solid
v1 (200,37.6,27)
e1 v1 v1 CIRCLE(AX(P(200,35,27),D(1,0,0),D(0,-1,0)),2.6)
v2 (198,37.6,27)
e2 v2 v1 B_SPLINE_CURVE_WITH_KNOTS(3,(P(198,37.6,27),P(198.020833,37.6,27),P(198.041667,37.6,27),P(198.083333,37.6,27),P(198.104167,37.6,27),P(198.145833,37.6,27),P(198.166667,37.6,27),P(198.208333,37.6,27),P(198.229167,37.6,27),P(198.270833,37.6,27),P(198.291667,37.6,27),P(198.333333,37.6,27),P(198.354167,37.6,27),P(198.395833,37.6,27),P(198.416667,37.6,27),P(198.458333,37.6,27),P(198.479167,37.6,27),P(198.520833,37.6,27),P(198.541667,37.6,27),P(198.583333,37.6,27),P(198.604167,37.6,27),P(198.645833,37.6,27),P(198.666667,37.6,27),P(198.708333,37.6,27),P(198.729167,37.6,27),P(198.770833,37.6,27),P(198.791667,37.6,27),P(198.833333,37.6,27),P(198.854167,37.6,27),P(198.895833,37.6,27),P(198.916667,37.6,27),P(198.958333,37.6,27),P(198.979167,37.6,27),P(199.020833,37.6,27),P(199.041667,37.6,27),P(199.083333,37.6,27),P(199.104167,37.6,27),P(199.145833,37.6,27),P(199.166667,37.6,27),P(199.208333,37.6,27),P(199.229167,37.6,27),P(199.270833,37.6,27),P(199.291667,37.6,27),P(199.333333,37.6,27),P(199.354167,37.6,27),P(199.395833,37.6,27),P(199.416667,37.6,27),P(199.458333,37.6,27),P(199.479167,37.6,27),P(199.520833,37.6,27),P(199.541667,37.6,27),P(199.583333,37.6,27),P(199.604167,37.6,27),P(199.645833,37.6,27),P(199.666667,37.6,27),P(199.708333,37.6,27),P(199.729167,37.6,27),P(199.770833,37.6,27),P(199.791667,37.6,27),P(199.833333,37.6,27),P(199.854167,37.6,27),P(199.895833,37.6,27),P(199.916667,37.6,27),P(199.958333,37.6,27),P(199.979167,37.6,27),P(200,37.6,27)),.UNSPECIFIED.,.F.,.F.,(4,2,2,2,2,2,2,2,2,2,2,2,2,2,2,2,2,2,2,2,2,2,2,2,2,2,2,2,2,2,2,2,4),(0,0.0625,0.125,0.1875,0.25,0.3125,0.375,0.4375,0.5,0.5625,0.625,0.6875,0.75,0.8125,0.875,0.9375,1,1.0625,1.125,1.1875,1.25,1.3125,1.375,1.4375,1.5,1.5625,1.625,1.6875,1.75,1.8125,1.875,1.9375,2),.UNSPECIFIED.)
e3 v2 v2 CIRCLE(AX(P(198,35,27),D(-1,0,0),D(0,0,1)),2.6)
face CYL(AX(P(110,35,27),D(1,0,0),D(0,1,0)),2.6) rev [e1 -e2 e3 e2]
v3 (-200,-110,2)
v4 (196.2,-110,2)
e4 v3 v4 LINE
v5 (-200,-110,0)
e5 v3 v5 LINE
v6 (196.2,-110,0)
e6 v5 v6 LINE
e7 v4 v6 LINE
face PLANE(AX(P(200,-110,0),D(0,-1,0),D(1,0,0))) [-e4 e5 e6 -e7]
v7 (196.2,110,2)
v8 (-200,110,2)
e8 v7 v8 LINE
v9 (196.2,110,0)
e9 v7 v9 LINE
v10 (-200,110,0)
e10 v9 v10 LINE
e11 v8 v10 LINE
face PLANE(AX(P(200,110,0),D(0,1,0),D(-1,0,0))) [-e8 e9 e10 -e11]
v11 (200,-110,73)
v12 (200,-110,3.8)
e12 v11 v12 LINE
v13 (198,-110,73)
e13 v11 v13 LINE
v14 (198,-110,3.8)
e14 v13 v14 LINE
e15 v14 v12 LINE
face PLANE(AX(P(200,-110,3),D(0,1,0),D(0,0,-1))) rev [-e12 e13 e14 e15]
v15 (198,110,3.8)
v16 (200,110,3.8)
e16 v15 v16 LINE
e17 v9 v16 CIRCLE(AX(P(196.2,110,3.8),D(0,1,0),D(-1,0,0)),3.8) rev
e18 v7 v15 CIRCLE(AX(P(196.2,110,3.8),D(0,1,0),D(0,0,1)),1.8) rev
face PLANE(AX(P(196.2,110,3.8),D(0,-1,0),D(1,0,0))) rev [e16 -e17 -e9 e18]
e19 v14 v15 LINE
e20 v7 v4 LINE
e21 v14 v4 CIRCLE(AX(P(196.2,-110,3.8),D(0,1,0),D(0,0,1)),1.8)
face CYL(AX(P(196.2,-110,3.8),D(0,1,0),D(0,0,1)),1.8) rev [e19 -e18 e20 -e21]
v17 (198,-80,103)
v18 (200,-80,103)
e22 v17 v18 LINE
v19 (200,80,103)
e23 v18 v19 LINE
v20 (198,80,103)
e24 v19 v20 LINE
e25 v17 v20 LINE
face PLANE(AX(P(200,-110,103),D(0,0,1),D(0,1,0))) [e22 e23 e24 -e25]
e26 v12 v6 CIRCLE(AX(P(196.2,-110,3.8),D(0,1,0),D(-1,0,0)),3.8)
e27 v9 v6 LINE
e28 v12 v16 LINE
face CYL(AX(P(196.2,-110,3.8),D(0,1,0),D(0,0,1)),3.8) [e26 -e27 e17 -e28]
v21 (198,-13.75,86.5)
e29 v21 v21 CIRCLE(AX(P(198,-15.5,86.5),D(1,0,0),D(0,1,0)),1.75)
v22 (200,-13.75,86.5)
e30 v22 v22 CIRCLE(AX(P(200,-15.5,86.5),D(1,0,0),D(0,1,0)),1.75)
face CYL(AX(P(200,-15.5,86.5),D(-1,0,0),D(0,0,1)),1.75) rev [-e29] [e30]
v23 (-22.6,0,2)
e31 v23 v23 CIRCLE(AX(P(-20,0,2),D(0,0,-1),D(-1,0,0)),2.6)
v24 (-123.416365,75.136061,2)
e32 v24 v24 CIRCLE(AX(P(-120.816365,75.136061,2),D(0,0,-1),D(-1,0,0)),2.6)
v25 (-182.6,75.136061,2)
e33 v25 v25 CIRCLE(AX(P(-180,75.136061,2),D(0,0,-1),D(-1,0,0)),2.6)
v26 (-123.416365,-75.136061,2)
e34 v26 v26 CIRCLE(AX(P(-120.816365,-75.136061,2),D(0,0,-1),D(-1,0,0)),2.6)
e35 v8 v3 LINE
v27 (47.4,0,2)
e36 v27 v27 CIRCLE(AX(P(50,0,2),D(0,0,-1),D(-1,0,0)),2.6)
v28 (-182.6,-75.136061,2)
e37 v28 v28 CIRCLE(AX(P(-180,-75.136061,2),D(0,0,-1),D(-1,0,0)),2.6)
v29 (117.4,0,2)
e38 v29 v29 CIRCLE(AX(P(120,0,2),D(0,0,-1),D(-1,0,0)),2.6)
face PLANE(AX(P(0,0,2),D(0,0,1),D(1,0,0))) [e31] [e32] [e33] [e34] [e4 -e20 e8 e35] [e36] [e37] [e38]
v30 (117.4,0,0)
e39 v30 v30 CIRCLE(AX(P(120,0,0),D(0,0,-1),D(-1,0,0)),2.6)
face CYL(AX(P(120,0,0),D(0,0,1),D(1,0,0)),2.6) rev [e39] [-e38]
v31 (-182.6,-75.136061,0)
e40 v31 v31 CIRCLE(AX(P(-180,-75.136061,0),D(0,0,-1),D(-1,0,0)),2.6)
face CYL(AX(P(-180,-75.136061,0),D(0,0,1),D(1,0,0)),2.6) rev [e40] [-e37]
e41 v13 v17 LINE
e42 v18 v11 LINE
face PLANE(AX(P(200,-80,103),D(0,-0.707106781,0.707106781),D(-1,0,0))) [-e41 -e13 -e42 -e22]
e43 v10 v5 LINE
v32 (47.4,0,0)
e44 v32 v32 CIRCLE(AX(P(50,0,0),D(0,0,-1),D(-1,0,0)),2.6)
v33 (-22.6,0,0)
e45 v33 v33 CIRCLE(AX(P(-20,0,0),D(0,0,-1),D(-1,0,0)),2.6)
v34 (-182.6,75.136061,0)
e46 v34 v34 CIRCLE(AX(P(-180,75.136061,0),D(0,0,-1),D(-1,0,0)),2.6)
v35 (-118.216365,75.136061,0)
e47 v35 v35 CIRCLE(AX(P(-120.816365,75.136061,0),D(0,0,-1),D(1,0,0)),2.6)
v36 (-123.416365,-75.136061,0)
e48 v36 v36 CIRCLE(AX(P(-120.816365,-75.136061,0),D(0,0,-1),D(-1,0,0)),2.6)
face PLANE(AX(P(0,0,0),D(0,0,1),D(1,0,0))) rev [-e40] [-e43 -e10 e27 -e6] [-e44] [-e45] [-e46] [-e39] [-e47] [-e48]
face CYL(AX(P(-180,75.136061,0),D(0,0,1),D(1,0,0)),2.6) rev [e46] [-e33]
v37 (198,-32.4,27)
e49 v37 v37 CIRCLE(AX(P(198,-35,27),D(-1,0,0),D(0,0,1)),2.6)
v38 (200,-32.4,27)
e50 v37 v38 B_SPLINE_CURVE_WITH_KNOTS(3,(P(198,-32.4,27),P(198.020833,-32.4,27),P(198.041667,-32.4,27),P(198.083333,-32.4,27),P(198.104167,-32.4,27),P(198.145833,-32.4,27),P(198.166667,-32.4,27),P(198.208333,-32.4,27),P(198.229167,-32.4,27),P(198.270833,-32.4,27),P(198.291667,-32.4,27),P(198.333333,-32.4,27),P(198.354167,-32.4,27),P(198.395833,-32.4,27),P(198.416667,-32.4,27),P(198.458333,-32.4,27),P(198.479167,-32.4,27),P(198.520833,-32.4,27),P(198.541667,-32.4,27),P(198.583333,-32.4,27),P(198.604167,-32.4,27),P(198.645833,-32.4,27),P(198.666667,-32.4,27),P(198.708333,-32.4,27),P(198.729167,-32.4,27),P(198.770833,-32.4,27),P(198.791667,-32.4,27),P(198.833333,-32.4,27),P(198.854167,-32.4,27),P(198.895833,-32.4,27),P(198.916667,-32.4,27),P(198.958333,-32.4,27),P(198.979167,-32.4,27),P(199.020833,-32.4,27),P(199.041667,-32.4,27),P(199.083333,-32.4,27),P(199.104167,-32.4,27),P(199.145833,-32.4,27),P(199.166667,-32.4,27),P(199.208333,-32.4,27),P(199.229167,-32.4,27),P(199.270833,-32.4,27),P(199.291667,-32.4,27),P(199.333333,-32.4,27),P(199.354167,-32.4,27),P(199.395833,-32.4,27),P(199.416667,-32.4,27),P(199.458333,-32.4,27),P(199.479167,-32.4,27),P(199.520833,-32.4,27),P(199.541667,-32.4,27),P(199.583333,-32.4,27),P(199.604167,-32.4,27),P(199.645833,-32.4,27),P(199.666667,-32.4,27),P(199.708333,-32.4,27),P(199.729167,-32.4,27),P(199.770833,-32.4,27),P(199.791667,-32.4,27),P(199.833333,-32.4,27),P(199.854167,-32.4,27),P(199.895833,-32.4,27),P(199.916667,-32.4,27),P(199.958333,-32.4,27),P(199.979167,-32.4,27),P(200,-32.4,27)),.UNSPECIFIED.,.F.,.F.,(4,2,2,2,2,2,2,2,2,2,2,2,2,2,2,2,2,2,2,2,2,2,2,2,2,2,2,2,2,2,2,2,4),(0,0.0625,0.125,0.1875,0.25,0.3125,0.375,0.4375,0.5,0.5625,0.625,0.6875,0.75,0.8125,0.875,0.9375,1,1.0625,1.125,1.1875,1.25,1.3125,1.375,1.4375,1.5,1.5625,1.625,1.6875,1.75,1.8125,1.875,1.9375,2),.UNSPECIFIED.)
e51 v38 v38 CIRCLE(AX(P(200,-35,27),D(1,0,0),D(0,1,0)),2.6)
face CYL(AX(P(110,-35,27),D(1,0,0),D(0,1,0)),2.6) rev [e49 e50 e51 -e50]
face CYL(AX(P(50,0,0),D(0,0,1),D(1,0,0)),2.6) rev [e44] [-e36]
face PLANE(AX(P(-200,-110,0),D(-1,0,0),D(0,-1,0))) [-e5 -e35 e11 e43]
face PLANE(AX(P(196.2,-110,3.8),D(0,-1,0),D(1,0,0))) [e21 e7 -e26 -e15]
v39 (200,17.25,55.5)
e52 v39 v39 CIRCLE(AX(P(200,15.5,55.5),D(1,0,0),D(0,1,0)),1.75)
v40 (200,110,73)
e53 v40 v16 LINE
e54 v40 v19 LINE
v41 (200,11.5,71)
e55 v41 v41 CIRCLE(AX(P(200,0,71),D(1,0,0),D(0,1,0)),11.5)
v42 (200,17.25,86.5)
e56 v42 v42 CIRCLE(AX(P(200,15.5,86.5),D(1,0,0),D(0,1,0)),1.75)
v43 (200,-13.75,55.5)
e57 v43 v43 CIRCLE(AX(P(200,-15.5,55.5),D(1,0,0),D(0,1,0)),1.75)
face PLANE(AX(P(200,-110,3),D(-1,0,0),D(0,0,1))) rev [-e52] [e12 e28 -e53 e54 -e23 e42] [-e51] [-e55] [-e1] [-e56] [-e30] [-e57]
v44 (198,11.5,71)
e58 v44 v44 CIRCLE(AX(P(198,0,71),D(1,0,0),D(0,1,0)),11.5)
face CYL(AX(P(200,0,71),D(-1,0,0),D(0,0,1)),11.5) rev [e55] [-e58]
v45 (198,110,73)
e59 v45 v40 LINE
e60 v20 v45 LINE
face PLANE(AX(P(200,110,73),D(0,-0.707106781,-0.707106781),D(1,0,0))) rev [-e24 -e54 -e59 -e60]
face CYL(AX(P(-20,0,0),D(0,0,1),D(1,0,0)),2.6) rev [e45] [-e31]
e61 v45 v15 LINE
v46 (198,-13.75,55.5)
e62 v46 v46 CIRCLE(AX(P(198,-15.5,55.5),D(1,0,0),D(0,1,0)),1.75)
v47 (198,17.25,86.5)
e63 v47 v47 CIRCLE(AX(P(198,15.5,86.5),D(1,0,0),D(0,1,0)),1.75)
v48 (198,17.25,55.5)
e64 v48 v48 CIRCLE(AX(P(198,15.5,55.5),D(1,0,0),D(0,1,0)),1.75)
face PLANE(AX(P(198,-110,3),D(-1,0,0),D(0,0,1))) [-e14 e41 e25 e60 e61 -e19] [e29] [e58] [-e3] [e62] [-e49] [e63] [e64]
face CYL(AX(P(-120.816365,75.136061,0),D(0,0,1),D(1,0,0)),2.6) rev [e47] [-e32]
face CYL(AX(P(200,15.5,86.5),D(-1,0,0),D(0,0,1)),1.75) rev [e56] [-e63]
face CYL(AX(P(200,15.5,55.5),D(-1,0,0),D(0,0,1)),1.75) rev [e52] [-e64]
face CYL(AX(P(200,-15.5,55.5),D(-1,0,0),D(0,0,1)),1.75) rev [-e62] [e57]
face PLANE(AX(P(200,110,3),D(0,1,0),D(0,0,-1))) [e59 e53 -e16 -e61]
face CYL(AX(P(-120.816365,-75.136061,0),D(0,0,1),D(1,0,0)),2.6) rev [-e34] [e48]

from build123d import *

# Parameters (mm, degrees)
SKETCH1_W            = 400
SKETCH1_H            = 220
BOSS_EXTRUDE1_DEPTH  = 3
SKETCH2_R            = 2.6
CUT_EXTRUDE1_DEPTH   = 90
SKETCH3_W            = 4
SKETCH3_H            = 220
BOSS_EXTRUDE2_DEPTH  = 90
SKETCH4_R            = 11.5
CUT_EXTRUDE2_DEPTH   = 90
SKETCH5_R            = 1.75
CUT_EXTRUDE3_DEPTH   = 90
SKETCH7_W            = 4
SKETCH7_H            = 220
BOSS_EXTRUDE3_DEPTH  = 10
CONVERT_SOLID2_START = -110
CONVERT_SOLID2_DEPTH = 220
CHAMFER1_SIZE        = 30
SKETCH6_R            = 2.6
CUT_EXTRUDE4_DEPTH   = 90


# Read off the part's stored shape, not the designer's step: Convert-Solid2
with BuildPart() as part:
    # Sketch1 → Boss-Extrude1 (new body)
    with BuildSketch(Plane.XY):
        Rectangle(SKETCH1_W, SKETCH1_H)
    extrude(amount=BOSS_EXTRUDE1_DEPTH)

    # Sketch2 → Cut-Extrude1 (cut)
    with BuildSketch(Plane(origin=(0, 0, 0), x_dir=(-1, 0, 0), z_dir=(0, 0, -1))):
        with Locations((-120, 0)):
            Circle(SKETCH2_R)
        with Locations((-50, 0)):
            Circle(SKETCH2_R)
        with Locations((20, 0)):
            Circle(SKETCH2_R)
        with Locations((120.81636457, -75.136060762)):
            Circle(SKETCH2_R)
        with Locations((120.81636457, 75.136060762)):
            Circle(SKETCH2_R)
        with Locations((180, 75.136060762)):
            Circle(SKETCH2_R)
        with Locations((180, -75.136060762)):
            Circle(SKETCH2_R)
    extrude(amount=-CUT_EXTRUDE1_DEPTH, mode=Mode.SUBTRACT)

    # Sketch3 → Boss-Extrude2 (add)
    with BuildSketch(Plane.XY.offset(3)):
        with Locations((198, 0)):
            Rectangle(SKETCH3_W, SKETCH3_H)
    extrude(amount=BOSS_EXTRUDE2_DEPTH)

    # Sketch4 → Cut-Extrude2 (cut)
    with BuildSketch(Plane(origin=(200, 0, 0), x_dir=(0, 0, -1), z_dir=(1, 0, 0))):
        with Locations(Location((-71, 0, 0), (0, 0, 90))):
            Circle(SKETCH4_R)
    extrude(amount=-CUT_EXTRUDE2_DEPTH, mode=Mode.SUBTRACT)

    # Sketch5 → Cut-Extrude3 (cut)
    with BuildSketch(Plane(origin=(200, 0, 0), x_dir=(0, 0, -1), z_dir=(1, 0, 0))):
        with Locations(Location((-55.5, 15.5, 0), (0, 0, 90))):
            Circle(SKETCH5_R)
        with Locations(Location((-55.5, -15.5, 0), (0, 0, 90))):
            Circle(SKETCH5_R)
        with Locations(Location((-86.5, -15.5, 0), (0, 0, 90))):
            Circle(SKETCH5_R)
        with Locations(Location((-86.5, 15.5, 0), (0, 0, 90))):
            Circle(SKETCH5_R)
    extrude(amount=-CUT_EXTRUDE3_DEPTH, mode=Mode.SUBTRACT)

    # Sketch7 → Boss-Extrude3 (add)
    with BuildSketch(Plane.XY.offset(93)):
        with Locations((198, 0)):
            Rectangle(SKETCH7_W, SKETCH7_H)
    extrude(amount=BOSS_EXTRUDE3_DEPTH)

    # Convert-Solid2 outline → Convert-Solid2 (cut)
    with BuildSketch(Plane(origin=(0, 0, 0), x_dir=(1, 0, 0), z_dir=(0, 1, 0)).offset(CONVERT_SOLID2_START)):
        with BuildLine():
            ThreePointArc((196.2, 0), (198.887005769, -1.112994231), (200, -3.8))
            Line((200, -3.8), (200, 0))
            Line((200, 0), (196.2, 0))
        make_face()
        with BuildLine():
            Line((196, -103), (198, -103))
            Line((198, -103), (198, -3.8))
            ThreePointArc((198, -3.8), (197.472792206, -2.527207794), (196.2, -2))
            Line((196.2, -2), (-200, -2))
            Line((-200, -2), (-200, -3))
            Line((-200, -3), (196, -3))
            Line((196, -3), (196, -103))
        make_face()
    extrude(amount=CONVERT_SOLID2_DEPTH, mode=Mode.SUBTRACT)

    # Chamfer1
    chamfer1_edges = [part.edges().sort_by_distance(p)[0] for p in [
        (199, -110, 103),
        (199, 110, 103),
    ]]
    chamfer(chamfer1_edges, length=CHAMFER1_SIZE)

    # Sketch6 → Cut-Extrude4 (cut)
    with BuildSketch(Plane(origin=(200, 0, 0), x_dir=(0, 0, -1), z_dir=(1, 0, 0))):
        with Locations(Location((-27, -35, 0), (0, 0, 90))):
            Circle(SKETCH6_R)
        with Locations(Location((-27, 35, 0), (0, 0, 90))):
            Circle(SKETCH6_R)
    extrude(amount=-CUT_EXTRUDE4_DEPTH, mode=Mode.SUBTRACT)


solid = part.part
